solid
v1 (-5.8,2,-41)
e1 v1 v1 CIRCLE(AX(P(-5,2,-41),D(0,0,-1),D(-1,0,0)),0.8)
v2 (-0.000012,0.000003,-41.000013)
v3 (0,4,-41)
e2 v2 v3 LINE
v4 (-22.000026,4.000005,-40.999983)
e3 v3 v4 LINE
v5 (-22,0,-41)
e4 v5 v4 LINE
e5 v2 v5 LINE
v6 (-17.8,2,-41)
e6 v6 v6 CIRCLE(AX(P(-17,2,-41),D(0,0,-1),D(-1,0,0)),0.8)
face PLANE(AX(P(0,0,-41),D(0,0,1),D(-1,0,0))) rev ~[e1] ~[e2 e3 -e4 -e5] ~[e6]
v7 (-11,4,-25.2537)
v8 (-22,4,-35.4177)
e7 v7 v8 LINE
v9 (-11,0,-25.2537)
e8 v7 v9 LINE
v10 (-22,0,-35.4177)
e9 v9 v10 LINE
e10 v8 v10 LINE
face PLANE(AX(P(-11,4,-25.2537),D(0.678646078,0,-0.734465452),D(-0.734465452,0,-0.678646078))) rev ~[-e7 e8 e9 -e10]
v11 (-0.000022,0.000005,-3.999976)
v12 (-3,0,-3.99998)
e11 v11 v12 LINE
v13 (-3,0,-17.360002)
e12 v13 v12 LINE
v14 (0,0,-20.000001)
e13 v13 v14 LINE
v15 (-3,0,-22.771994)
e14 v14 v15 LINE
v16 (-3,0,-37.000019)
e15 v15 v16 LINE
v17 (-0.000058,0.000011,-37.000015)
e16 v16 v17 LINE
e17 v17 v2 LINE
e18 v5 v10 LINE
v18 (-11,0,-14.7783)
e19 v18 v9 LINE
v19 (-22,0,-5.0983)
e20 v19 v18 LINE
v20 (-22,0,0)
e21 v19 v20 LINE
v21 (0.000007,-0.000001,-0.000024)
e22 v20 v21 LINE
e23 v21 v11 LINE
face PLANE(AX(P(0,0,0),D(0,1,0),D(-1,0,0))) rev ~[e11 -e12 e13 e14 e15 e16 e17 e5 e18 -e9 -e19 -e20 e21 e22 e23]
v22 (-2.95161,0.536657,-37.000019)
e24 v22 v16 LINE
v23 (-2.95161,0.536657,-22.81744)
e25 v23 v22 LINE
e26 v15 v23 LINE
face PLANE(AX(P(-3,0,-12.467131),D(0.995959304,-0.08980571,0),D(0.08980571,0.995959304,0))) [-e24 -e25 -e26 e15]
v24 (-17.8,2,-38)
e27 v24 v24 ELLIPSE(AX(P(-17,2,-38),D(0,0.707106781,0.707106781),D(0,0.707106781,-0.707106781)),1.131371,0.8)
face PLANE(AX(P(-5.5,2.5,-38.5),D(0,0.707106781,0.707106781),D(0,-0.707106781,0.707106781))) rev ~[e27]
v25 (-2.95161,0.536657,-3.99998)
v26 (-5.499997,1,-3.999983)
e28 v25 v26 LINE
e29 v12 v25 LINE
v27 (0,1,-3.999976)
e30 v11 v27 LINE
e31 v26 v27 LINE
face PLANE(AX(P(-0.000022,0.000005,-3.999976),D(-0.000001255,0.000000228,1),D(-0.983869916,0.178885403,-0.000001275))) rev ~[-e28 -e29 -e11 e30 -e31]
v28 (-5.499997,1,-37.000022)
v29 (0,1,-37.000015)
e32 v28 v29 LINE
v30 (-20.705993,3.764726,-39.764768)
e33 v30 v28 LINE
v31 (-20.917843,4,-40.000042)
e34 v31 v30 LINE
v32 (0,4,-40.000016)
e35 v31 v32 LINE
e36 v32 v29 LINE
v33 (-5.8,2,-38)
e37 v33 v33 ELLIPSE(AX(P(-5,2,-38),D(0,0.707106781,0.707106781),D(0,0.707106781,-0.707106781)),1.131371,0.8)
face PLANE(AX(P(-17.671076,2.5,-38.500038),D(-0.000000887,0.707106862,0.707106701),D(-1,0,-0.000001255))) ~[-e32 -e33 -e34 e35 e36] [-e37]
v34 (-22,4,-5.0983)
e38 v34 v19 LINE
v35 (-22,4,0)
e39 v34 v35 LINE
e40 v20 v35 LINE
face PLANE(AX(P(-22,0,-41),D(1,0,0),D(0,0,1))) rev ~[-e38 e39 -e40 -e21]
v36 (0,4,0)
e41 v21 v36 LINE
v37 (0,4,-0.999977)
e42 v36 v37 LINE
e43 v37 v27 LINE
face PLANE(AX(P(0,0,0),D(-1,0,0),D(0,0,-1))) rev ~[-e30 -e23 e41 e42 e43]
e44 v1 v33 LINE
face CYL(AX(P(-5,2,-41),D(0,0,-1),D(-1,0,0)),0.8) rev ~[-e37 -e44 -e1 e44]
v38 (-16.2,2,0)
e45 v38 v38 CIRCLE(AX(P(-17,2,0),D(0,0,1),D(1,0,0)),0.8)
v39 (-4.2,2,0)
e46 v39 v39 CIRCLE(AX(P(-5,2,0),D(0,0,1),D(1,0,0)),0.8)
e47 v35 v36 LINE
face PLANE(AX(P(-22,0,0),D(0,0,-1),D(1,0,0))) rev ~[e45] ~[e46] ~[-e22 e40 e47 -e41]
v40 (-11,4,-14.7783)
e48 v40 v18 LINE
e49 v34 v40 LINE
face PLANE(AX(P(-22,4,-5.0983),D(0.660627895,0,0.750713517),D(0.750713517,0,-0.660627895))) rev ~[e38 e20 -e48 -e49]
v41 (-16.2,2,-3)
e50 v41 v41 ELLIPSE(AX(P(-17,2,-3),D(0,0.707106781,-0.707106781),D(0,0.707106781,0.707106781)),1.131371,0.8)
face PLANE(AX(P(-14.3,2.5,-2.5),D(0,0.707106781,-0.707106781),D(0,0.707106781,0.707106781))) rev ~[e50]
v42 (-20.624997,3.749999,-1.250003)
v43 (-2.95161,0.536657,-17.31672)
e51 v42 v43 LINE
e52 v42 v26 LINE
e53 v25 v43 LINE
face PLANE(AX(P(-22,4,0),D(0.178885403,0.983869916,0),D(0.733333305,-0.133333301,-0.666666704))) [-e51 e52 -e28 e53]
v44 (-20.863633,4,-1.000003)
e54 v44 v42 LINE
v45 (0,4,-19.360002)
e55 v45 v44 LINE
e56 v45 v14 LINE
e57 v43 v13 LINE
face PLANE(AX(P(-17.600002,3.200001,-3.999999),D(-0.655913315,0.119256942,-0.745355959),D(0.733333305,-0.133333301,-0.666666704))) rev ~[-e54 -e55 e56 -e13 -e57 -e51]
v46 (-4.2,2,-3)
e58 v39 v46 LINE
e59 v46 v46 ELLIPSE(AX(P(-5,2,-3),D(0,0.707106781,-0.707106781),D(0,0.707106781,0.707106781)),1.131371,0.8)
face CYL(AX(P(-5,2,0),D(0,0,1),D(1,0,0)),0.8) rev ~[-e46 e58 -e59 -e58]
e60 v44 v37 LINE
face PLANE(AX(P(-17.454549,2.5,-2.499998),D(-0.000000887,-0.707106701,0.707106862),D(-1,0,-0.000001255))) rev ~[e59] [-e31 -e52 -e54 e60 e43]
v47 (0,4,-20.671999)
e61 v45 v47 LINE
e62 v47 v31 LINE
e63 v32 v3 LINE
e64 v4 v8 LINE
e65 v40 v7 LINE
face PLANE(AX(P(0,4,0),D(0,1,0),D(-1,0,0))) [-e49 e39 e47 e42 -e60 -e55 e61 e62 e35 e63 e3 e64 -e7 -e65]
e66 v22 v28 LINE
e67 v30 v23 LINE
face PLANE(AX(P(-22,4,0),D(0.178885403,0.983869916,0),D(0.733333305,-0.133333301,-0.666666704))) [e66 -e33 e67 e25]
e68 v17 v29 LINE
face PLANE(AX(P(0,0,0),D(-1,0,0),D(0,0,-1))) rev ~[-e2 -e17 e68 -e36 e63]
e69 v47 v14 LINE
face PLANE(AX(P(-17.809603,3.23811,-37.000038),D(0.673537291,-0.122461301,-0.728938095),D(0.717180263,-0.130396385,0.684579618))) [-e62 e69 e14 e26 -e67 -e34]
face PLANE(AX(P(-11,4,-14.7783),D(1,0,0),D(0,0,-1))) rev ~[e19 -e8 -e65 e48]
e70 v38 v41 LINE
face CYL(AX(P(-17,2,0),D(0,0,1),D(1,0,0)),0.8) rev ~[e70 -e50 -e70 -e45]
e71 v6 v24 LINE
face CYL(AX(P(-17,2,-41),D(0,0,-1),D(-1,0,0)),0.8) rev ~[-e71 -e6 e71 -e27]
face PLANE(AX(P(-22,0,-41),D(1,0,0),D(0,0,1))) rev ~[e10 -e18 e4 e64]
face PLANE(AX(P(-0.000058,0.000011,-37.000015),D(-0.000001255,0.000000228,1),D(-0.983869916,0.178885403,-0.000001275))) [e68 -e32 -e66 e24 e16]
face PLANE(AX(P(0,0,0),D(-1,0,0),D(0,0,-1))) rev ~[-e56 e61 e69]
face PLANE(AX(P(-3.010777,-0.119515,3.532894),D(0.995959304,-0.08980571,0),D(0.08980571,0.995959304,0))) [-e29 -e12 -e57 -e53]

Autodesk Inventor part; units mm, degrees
ref_plane "YZ Plane" through (0, 0, 0) normal (1, 0, 0) x (0, 1, 0)
ref_plane "XZ Plane" through (0, 0, 0) normal (0, 1, 0) x (-1, 0, 0)
sketch "スケッチ1" plane through (0, 0, 0) normal (0, 1, 0) x (-1, 0, 0)
  line L0 (22, 0) -> (0, 0)
  line L1 (0, 0) -> (0, -41)
  line L2 (0, -41) -> (22, -41)
  line L3 (22, -41) -> (22, 0)
  dimension "d0" = 41
  dimension "d1" = 22
extrude "押し出し1" add sketch "スケッチ1" along normal blind 4
sketch "スケッチ2" plane through (0, 0, 0) normal (1, 0, 0) x (0, 0, -1)
  line L0 (0, 0) -> (41, 0) projected
  line L1 (41, 0) -> (41, 4) projected
  line L2 (0, 4) -> (41, 4) projected
  line L3 (0, 0) -> (0, 4) projected
  point P0 (20, 0)
ref_plane "作業平面1" through (-22, 4, 0) normal (0.1788854, 0.9838699, 0) x (0.7333333, -0.1333333, -0.6666667)
sketch "スケッチ3" plane through (-22, 4, 0) normal (0.1788854, 0.9838699, 0) x (0.7333333, -0.1333333, -0.6666667)
  line L0 (27.3333, 30.5596) -> (0, 0) projected
  line L1 (16.6667, -14.9071) -> (44, 15.6525) projected
  line L2 (16.6667, -14.9071) -> (44, 15.6525) projected
  line L3 (0, 0) -> (30, 0)
  line L4 (27.3333, 30.5596) -> (30, 0)
  line L5 (-20, -21.3606) -> (60, -21.3606)
  line L6 (60, -21.3606) -> (60, 40)
  line L7 (60, 40) -> (-20, 40)
  line L8 (-20, 40) -> (-20, -21.3606)
  line L9 (16.6667, -14.9071) -> (19.3333, -11.9257)
  line L10 (19.3333, -11.9257) -> (2.6667, 2.9814)
  line L11 (2.6667, 2.9814) -> (0, 0)
  line L12 (0, 0) -> (16.6667, -14.9071)
  line L13 (44, 15.6525) -> (41.3333, 12.6711)
  line L14 (41.3333, 12.6711) -> (24.6667, 27.5782)
  line L15 (24.6667, 27.5782) -> (27.3333, 30.5596)
  line L16 (27.3333, 30.5596) -> (44, 15.6525)
  point P0 (41.3333, 12.6711)
  point P1 (27.8413, 24.7387)
  point P2 (6, 0)
  dimension "d10" = 4
  dimension "d11" = 4
extrude "押し出し2" cut sketch "スケッチ3" along normal through all contours L14 L1 L4 | L1 L10 L3 | L8 L7 L6 L5
sketch "スケッチ4" plane through (0, 4, 0) normal (0, 1, 0) x (1, 0, 0)
  line L0 (0, 20.672) -> (-17.671, 37) projected
  line L1 (-22, 41) -> (-22, 0) projected
  line L2 (-17.4545, 4) -> (0, 19.36) projected
  line L3 (0, 19.36) -> (0, 20.672) projected
  line L4 (-22, 5.0983) -> (-11, 14.7783)
  line L5 (-11, 14.7783) -> (-11, 25.2537)
  line L6 (-11, 25.2537) -> (-22, 35.4177)
  line L7 (-22, 0) -> (0, 19.36) projected
  line L8 (0, 20.672) -> (-22, 41) projected
  line L9 (0, 4) -> (-17.4545, 4) projected
  line L10 (-17.671, 37) -> (0, 37) projected
  line L11 (0, 37) -> (0, 41) projected
  line L12 (0, 41) -> (-22, 41) projected
  line L13 (-22, 0) -> (0, 0) projected
  line L14 (0, 0) -> (0, 4) projected
  point P0 (-11, 20.016)
  point P1 (0, 20.016)
  dimension "d6" = 11
  dimension "d7" = 3.8274
extrude "押し出し3" cut sketch "スケッチ4" against normal through all contours L6 L5 L4 L1
chamfer "面取り1" distance 3 angle 45 2 edges at (-8.7273, 4, -4) (-8.8355, 4, -37)
chamfer "面取り2" distance 3 angle 45 1 edges at (0, 0, -12)
chamfer "面取り3" distance 3 angle 45 1 edges at (0, 0, -28.5)
sketch "スケッチ5" plane through (0, 0, -41) normal (0, 0, -1) x (-1, 0, 0)
  circle A0 centre (5, 2) radius 0.8
  circle A1 centre (17, 2) radius 0.8
  line L0 (0, 0) -> (0, 4) projected
  line L1 (22, 0) -> (22, 4) projected
  point P0 (0, 2)
  dimension "d21" = 1.6
  dimension "d22" = 1.6
  dimension "d23" = 5
  dimension "d24" = 5
extrude "押し出し4" cut sketch "スケッチ5" against normal up to surface surface through (-5.5, 2.5, -38.5) normal (0, 0.7071068, 0.7071068)
sketch "スケッチ7" plane through (-22, 0, 0) normal (0, 0, 1) x (1, 0, 0)
  circle A0 centre (17, 2) radius 0.8 projected
  circle A1 centre (5, 2) radius 0.8 projected
  point P0 (22, 0)
extrude "押し出し5" cut sketch "スケッチ7" against normal up to surface surface through (-14.3, 2.5, -2.5) normal (0, 0.7071068, -0.7071068)
equation "\"d11\" = d10"
equation "\"d24\" = d23"
properties part number "chest_cover"
